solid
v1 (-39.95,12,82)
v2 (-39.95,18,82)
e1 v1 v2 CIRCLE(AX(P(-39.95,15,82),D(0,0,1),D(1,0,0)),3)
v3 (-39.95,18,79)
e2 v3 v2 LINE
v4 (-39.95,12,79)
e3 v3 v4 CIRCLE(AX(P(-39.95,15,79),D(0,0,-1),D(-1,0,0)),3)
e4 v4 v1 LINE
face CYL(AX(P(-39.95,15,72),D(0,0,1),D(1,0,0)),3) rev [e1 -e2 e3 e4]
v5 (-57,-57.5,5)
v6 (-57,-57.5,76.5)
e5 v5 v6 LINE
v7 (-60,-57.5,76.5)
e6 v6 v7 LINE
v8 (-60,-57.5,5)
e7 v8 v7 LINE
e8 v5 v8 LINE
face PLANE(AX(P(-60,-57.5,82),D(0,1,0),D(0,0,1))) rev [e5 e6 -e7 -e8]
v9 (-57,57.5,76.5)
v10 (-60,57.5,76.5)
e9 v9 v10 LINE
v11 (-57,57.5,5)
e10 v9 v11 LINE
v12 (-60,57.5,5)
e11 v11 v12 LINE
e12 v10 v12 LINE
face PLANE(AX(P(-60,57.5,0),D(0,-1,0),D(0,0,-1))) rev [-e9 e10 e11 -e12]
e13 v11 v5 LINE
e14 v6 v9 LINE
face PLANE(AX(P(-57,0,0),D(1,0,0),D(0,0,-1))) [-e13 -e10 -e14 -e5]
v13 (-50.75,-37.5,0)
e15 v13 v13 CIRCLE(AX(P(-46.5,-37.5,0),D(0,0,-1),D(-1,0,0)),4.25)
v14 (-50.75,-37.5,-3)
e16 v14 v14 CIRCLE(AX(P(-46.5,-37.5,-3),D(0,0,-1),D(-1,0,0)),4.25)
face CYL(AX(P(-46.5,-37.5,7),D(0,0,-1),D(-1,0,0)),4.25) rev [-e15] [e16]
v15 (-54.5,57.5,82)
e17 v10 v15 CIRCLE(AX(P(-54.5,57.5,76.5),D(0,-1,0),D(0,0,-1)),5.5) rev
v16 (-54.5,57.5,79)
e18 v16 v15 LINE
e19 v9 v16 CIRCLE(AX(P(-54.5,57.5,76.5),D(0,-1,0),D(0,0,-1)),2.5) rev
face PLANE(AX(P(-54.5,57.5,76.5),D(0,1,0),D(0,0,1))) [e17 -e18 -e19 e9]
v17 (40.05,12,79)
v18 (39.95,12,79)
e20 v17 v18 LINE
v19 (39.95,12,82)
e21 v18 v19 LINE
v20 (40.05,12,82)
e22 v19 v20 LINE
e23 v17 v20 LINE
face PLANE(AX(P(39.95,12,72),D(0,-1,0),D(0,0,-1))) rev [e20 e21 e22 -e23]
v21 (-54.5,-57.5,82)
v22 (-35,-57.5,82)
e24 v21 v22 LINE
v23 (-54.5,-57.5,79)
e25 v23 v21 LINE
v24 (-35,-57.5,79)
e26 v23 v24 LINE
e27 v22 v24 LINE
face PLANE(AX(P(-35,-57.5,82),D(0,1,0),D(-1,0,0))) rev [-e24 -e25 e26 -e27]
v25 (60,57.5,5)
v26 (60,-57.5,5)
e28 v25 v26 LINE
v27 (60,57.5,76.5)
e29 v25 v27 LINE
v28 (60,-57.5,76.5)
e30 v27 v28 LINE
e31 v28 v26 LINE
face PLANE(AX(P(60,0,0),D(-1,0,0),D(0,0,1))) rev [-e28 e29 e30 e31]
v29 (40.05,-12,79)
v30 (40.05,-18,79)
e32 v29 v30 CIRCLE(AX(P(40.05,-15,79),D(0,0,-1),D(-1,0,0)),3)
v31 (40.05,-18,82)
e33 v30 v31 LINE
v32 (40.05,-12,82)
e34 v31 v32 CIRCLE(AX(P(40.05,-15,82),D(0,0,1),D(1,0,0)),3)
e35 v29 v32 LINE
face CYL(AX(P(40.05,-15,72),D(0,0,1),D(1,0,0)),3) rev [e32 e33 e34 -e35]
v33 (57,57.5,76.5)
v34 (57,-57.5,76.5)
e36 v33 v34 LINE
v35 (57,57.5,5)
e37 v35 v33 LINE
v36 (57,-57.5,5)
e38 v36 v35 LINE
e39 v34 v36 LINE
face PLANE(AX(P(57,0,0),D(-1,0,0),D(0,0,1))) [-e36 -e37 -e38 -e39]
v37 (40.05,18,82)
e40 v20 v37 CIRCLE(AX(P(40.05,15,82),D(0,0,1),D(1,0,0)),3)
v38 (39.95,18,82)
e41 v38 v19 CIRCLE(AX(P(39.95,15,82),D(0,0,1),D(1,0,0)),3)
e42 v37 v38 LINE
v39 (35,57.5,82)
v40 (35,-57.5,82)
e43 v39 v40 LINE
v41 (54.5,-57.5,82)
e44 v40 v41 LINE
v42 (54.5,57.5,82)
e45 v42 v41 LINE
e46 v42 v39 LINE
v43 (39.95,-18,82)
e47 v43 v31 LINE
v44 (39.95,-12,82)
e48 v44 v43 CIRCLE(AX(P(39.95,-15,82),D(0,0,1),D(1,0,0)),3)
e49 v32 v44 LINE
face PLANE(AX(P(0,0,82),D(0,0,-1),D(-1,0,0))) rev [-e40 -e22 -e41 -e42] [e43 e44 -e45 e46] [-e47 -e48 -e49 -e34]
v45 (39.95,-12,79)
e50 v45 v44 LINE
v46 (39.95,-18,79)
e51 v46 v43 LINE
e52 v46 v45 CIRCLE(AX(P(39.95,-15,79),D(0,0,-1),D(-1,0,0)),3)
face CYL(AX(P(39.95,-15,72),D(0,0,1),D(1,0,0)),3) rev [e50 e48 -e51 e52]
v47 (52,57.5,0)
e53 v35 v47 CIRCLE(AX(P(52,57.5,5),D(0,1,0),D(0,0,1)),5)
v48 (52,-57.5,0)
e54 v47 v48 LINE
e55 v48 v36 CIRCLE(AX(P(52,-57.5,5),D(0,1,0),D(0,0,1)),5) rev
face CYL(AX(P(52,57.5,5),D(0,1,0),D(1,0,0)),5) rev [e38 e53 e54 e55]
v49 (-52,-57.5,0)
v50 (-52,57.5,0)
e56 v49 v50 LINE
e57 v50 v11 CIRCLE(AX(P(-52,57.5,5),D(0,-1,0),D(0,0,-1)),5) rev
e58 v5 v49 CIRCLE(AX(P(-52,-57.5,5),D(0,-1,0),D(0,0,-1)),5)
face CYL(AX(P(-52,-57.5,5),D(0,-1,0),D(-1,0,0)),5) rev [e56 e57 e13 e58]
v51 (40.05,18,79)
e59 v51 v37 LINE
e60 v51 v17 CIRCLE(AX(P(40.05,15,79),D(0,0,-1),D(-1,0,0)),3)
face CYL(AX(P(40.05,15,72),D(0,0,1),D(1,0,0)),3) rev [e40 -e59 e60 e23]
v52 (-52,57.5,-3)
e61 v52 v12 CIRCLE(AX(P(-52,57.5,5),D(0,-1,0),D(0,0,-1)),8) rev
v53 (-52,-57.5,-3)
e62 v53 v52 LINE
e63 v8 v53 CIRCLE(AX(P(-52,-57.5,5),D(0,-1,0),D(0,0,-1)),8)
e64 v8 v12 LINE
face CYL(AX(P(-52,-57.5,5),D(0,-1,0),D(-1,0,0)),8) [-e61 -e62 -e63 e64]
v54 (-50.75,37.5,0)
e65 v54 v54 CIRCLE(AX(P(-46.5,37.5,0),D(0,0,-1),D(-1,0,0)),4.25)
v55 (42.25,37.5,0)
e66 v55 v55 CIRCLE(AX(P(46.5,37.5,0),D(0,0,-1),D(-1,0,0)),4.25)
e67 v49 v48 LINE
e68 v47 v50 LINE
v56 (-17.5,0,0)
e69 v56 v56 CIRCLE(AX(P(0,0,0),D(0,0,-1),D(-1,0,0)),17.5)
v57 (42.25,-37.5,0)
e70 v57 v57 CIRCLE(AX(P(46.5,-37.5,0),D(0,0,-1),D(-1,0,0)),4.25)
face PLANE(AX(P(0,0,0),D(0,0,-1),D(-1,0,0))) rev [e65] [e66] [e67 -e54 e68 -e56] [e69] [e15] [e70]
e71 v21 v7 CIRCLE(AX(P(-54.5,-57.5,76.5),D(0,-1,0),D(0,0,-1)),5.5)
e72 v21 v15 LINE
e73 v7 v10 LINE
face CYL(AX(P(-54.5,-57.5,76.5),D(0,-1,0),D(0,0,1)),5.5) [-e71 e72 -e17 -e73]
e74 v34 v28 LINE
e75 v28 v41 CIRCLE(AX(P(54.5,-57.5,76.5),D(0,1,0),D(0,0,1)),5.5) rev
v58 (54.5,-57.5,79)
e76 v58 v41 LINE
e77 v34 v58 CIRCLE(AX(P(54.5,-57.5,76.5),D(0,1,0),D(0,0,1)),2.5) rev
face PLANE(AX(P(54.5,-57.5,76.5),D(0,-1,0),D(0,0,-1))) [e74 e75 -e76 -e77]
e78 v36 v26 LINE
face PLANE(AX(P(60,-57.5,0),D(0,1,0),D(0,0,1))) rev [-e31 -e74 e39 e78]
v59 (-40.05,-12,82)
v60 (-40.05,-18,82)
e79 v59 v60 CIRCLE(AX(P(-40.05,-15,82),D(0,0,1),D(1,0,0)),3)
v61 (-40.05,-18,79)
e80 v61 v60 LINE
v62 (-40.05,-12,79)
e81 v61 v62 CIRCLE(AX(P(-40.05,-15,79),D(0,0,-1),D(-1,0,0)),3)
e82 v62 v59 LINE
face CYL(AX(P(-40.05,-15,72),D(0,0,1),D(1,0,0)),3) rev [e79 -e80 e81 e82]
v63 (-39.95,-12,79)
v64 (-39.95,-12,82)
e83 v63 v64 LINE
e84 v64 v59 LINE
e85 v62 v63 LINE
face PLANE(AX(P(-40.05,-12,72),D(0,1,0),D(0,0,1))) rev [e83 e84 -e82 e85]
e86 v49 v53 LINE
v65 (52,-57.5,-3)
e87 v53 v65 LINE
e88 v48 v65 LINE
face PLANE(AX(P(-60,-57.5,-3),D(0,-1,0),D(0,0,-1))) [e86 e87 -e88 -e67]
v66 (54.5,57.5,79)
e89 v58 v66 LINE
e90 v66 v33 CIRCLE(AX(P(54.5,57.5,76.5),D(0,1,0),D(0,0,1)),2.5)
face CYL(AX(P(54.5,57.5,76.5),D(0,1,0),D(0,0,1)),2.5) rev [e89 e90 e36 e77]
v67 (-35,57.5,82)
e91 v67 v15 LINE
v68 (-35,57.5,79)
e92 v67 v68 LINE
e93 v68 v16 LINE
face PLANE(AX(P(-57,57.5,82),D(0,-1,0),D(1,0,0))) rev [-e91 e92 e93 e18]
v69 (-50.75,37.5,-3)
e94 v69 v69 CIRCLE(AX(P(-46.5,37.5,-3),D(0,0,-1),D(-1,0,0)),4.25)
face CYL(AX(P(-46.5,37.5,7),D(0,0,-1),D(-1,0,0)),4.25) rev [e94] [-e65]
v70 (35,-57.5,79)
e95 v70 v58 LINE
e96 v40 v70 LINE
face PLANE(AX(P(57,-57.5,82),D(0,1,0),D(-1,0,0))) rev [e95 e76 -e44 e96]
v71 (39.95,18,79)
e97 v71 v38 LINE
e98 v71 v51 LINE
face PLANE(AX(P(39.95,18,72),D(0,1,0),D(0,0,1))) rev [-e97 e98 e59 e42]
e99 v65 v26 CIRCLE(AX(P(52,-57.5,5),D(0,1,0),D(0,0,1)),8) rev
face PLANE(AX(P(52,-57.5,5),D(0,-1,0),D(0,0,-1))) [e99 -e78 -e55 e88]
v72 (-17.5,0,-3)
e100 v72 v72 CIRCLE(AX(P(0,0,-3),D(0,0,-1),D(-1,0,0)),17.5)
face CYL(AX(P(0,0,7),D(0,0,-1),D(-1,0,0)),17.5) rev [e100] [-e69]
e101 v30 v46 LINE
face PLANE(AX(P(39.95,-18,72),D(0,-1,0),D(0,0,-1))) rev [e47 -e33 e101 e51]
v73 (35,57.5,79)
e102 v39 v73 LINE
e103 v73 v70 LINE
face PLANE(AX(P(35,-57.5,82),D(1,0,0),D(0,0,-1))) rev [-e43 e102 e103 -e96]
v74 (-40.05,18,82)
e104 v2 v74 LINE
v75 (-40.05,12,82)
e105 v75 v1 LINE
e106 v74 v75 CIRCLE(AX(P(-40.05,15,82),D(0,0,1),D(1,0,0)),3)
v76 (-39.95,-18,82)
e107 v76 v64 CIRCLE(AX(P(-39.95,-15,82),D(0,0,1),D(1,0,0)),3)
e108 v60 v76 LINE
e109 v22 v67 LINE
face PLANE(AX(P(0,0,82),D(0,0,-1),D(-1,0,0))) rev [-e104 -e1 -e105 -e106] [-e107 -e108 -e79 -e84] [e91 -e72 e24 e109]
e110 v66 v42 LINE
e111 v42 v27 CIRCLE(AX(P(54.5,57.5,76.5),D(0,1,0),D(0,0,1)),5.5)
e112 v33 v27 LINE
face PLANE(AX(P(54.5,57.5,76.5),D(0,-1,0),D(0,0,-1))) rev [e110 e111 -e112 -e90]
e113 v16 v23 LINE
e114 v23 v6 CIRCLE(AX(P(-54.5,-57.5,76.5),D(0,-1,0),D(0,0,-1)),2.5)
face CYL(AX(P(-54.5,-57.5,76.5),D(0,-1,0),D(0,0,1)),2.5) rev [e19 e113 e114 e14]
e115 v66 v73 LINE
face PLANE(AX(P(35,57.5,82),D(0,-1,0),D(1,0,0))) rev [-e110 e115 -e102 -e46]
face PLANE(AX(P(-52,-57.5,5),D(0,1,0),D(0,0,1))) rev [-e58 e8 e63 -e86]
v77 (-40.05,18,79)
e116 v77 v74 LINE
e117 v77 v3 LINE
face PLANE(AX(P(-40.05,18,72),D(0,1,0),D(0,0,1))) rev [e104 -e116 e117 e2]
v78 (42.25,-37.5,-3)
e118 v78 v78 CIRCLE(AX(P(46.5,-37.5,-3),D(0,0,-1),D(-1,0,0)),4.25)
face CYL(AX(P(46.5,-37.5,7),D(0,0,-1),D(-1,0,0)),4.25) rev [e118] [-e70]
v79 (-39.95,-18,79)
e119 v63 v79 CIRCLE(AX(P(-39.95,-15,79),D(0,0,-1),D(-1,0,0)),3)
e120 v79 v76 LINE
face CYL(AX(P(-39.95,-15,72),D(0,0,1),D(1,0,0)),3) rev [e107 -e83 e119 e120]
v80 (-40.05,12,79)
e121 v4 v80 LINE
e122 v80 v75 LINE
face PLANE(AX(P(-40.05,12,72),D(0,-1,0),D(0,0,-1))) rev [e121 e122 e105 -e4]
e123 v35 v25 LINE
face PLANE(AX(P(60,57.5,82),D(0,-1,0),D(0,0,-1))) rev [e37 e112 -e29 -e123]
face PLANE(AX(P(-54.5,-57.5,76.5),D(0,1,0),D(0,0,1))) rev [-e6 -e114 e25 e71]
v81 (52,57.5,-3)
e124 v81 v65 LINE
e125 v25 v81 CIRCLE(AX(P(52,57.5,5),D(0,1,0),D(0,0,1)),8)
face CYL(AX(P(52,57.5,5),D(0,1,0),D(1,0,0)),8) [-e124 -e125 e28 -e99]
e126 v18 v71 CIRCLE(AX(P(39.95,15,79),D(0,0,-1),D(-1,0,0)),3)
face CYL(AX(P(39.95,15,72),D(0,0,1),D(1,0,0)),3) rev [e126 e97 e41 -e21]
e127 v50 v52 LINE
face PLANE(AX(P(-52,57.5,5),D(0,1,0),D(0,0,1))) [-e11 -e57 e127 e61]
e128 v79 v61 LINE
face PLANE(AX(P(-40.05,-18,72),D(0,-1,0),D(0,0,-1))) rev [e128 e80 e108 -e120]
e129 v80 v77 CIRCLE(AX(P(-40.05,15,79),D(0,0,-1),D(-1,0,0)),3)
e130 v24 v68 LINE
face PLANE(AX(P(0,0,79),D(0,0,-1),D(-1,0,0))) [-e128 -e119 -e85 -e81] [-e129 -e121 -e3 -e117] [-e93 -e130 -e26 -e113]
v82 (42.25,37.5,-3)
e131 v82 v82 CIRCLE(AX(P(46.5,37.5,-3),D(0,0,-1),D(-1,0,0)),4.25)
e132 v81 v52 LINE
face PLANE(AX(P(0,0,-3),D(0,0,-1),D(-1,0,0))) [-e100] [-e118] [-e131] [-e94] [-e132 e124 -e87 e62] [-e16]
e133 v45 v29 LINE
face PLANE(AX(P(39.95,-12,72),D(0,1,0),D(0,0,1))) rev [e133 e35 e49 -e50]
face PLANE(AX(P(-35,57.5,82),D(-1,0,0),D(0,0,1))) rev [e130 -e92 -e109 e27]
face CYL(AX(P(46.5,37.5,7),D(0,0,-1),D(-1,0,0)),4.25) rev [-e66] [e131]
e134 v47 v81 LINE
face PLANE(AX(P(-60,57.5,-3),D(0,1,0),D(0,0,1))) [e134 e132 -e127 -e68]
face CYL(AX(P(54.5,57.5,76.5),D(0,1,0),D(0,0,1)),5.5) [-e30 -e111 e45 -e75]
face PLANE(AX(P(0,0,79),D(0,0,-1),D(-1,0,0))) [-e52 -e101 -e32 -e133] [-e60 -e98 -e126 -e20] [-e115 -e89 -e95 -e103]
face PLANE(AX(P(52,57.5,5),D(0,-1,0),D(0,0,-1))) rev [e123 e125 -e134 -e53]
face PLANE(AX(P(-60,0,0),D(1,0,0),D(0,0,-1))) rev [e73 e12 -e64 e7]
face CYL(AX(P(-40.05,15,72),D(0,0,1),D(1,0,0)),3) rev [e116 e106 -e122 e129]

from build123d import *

# Parameters (mm, degrees)
SKETCH1_W                      = 120
SKETCH1_H                      = 115
BASE_FLANGE1_DEPTH             = 3
EDGE_FLANGE1_STRIP_W           = 22
EDGE_FLANGE1_STRIP_H           = 3
EDGE_FLANGE1_STRIP_CUT_DEPTH   = 115
EDGE_FLANGE1_STRIP_2_W         = 22
EDGE_FLANGE1_STRIP_2_H         = 3
EDGE_FLANGE1_STRIP_CUT_2_DEPTH = 115
EDGE_FLANGE1_DEPTH             = 115
EDGE_FLANGE1_BEND_DEPTH        = 115
EDGE_FLANGE2_STRIP_W           = 17
EDGE_FLANGE2_STRIP_H           = 3
EDGE_FLANGE2_STRIP_CUT_DEPTH   = 115
EDGE_FLANGE2_STRIP_2_W         = 17
EDGE_FLANGE2_STRIP_2_H         = 3
EDGE_FLANGE2_STRIP_CUT_2_DEPTH = 115
EDGE_FLANGE2_DEPTH             = 115
EDGE_FLANGE2_BEND_DEPTH        = 115
CUT_EXTRUDE1_DEPTH             = 10
LPATTERN1_COUNT                = 2
LPATTERN1_PITCH                = 30
LPATTERN2_COUNT                = 2
LPATTERN2_PITCH                = 80
LPATTERN2_COPY_1_DEPTH         = 10
SKETCH19_R                     = 4.25
CUT_EXTRUDE2_DEPTH             = 10
LPATTERN3_COUNT                = 2
LPATTERN3_PITCH                = 75
SKETCH20_R                     = 17.5
CUT_EXTRUDE3_DEPTH             = 10


# Sheet-metal steps are written as plain solids
with BuildPart() as part:
    # Sketch1 → Base-Flange1 (new body)
    with BuildSketch(Plane.XY):
        Rectangle(SKETCH1_W, SKETCH1_H)
    extrude(amount=-BASE_FLANGE1_DEPTH)

    # Edge-Flange1 strip (across the edge) → Edge-Flange1 strip cut (cut)
    with BuildSketch(Plane(origin=(60, -57.5, 0), x_dir=(-1, 0, 0), z_dir=(0, 1, 0))):
        with Locations((-3, -1.5)):
            Rectangle(EDGE_FLANGE1_STRIP_W, EDGE_FLANGE1_STRIP_H)
    extrude(amount=EDGE_FLANGE1_STRIP_CUT_DEPTH, mode=Mode.SUBTRACT)

    # Edge-Flange1 strip 2 (across the edge) → Edge-Flange1 strip cut 2 (cut)
    with BuildSketch(Plane(origin=(-60, 57.5, 0), x_dir=(1, 0, 0), z_dir=(0, -1, 0))):
        with Locations((-3, -1.5)):
            Rectangle(EDGE_FLANGE1_STRIP_2_W, EDGE_FLANGE1_STRIP_2_H)
    extrude(amount=EDGE_FLANGE1_STRIP_CUT_2_DEPTH, mode=Mode.SUBTRACT)

    # Edge-Flange1 section (across the edge) → Edge-Flange1 (add)
    with BuildSketch(Plane(origin=(60, -57.5, 0), x_dir=(-1, 0, 0), z_dir=(0, 1, 0))):
        with BuildLine():
            Line((0, 5), (0, 82))
            Line((0, 82), (3, 82))
            Line((3, 82), (3, 5))
            ThreePointArc((3, 5), (4.464466094, 1.464466094), (8, 0))
            Line((8, 0), (8, -3))
            ThreePointArc((8, -3), (2.343145751, -0.656854249), (0, 5))
        make_face()
    extrude(amount=EDGE_FLANGE1_DEPTH)

    # Edge-Flange1 section 2 (across the edge) → Edge-Flange1 bend (add)
    with BuildSketch(Plane(origin=(-60, 57.5, 0), x_dir=(1, 0, 0), z_dir=(0, -1, 0))):
        with BuildLine():
            Line((0, 5), (0, 82))
            Line((0, 82), (3, 82))
            Line((3, 82), (3, 5))
            ThreePointArc((3, 5), (4.464466094, 1.464466094), (8, 0))
            Line((8, 0), (8, -3))
            ThreePointArc((8, -3), (2.343145751, -0.656854249), (0, 5))
        make_face()
    extrude(amount=EDGE_FLANGE1_BEND_DEPTH)

    # Edge-Flange2 strip (across the edge) → Edge-Flange2 strip cut (cut)
    with BuildSketch(Plane(origin=(-57, 57.5, 82), x_dir=(0, 0, -1), z_dir=(0, -1, 0))):
        with Locations((-3, -1.5)):
            Rectangle(EDGE_FLANGE2_STRIP_W, EDGE_FLANGE2_STRIP_H)
    extrude(amount=EDGE_FLANGE2_STRIP_CUT_DEPTH, mode=Mode.SUBTRACT)

    # Edge-Flange2 strip 2 (across the edge) → Edge-Flange2 strip cut 2 (cut)
    with BuildSketch(Plane(origin=(57, -57.5, 82), x_dir=(0, 0, -1), z_dir=(0, 1, 0))):
        with Locations((-3, -1.5)):
            Rectangle(EDGE_FLANGE2_STRIP_2_W, EDGE_FLANGE2_STRIP_2_H)
    extrude(amount=EDGE_FLANGE2_STRIP_CUT_2_DEPTH, mode=Mode.SUBTRACT)

    # Edge-Flange2 section (across the edge) → Edge-Flange2 (add)
    with BuildSketch(Plane(origin=(-57, 57.5, 82), x_dir=(0, 0, -1), z_dir=(0, -1, 0))):
        with BuildLine():
            Line((0, 2.5), (0, 22))
            Line((0, 22), (3, 22))
            Line((3, 22), (3, 2.5))
            ThreePointArc((3, 2.5), (3.732233047, 0.732233047), (5.5, 0))
            Line((5.5, 0), (5.5, -3))
            ThreePointArc((5.5, -3), (1.610912703, -1.389087297), (0, 2.5))
        make_face()
    extrude(amount=EDGE_FLANGE2_DEPTH)

    # Edge-Flange2 section 2 (across the edge) → Edge-Flange2 bend (add)
    with BuildSketch(Plane(origin=(57, -57.5, 82), x_dir=(0, 0, -1), z_dir=(0, 1, 0))):
        with BuildLine():
            Line((0, 2.5), (0, 22))
            Line((0, 22), (3, 22))
            Line((3, 22), (3, 2.5))
            ThreePointArc((3, 2.5), (3.732233047, 0.732233047), (5.5, 0))
            Line((5.5, 0), (5.5, -3))
            ThreePointArc((5.5, -3), (1.610912703, -1.389087297), (0, 2.5))
        make_face()
    extrude(amount=EDGE_FLANGE2_BEND_DEPTH)

    # Sketch18 → Cut-Extrude1 (cut)
    with BuildSketch(Plane.XY.offset(82)):
        with BuildLine():
            Line((-40.05, -12), (-39.95, -12))
            ThreePointArc((-39.95, -12), (-36.95, -15), (-39.95, -18))
            Line((-39.95, -18), (-40.05, -18))
            ThreePointArc((-40.05, -18), (-43.05, -15), (-40.05, -12))
        make_face()
    cut_extrude1 = extrude(amount=-CUT_EXTRUDE1_DEPTH, mode=Mode.SUBTRACT)

    # LPattern1: Cut-Extrude1 ×2
    with Locations(*[(0, i * LPATTERN1_PITCH, 0) for i in range(1, LPATTERN1_COUNT)]):
        add(cut_extrude1, mode=Mode.SUBTRACT)

    # LPattern2: Cut-Extrude1 ×2
    with Locations(*[(i * LPATTERN2_PITCH, 0, 0) for i in range(1, LPATTERN2_COUNT)]):
        add(cut_extrude1, mode=Mode.SUBTRACT)

    # LPattern2 copy 1 sketch → LPattern2 copy 1 (cut)
    with BuildSketch(Plane(origin=(80, 30, 82), x_dir=(1, 0, 0), z_dir=(0, 0, 1))):
        with BuildLine():
            Line((-40.05, -12), (-39.95, -12))
            ThreePointArc((-39.95, -12), (-36.95, -15), (-39.95, -18))
            Line((-39.95, -18), (-40.05, -18))
            ThreePointArc((-40.05, -18), (-43.05, -15), (-40.05, -12))
        make_face()
    extrude(amount=-LPATTERN2_COPY_1_DEPTH, mode=Mode.SUBTRACT)

    # Sketch19 → Cut-Extrude2 (cut)
    with BuildSketch(Plane(origin=(0, 0, -3), x_dir=(-1, 0, 0), z_dir=(0, 0, -1))):
        with Locations((-46.5, -37.5)):
            Circle(SKETCH19_R)
        with Locations((46.5, -37.5)):
            Circle(SKETCH19_R)
    cut_extrude2 = extrude(amount=-CUT_EXTRUDE2_DEPTH, mode=Mode.SUBTRACT)

    # LPattern3: Cut-Extrude2 ×2
    with Locations(*[(0, i * LPATTERN3_PITCH, 0) for i in range(1, LPATTERN3_COUNT)]):
        add(cut_extrude2, mode=Mode.SUBTRACT)

    # Sketch20 → Cut-Extrude3 (cut)
    with BuildSketch(Plane(origin=(0, 0, -3), x_dir=(-1, 0, 0), z_dir=(0, 0, -1))):
        Circle(SKETCH20_R)
    extrude(amount=-CUT_EXTRUDE3_DEPTH, mode=Mode.SUBTRACT)


solid = part.part
